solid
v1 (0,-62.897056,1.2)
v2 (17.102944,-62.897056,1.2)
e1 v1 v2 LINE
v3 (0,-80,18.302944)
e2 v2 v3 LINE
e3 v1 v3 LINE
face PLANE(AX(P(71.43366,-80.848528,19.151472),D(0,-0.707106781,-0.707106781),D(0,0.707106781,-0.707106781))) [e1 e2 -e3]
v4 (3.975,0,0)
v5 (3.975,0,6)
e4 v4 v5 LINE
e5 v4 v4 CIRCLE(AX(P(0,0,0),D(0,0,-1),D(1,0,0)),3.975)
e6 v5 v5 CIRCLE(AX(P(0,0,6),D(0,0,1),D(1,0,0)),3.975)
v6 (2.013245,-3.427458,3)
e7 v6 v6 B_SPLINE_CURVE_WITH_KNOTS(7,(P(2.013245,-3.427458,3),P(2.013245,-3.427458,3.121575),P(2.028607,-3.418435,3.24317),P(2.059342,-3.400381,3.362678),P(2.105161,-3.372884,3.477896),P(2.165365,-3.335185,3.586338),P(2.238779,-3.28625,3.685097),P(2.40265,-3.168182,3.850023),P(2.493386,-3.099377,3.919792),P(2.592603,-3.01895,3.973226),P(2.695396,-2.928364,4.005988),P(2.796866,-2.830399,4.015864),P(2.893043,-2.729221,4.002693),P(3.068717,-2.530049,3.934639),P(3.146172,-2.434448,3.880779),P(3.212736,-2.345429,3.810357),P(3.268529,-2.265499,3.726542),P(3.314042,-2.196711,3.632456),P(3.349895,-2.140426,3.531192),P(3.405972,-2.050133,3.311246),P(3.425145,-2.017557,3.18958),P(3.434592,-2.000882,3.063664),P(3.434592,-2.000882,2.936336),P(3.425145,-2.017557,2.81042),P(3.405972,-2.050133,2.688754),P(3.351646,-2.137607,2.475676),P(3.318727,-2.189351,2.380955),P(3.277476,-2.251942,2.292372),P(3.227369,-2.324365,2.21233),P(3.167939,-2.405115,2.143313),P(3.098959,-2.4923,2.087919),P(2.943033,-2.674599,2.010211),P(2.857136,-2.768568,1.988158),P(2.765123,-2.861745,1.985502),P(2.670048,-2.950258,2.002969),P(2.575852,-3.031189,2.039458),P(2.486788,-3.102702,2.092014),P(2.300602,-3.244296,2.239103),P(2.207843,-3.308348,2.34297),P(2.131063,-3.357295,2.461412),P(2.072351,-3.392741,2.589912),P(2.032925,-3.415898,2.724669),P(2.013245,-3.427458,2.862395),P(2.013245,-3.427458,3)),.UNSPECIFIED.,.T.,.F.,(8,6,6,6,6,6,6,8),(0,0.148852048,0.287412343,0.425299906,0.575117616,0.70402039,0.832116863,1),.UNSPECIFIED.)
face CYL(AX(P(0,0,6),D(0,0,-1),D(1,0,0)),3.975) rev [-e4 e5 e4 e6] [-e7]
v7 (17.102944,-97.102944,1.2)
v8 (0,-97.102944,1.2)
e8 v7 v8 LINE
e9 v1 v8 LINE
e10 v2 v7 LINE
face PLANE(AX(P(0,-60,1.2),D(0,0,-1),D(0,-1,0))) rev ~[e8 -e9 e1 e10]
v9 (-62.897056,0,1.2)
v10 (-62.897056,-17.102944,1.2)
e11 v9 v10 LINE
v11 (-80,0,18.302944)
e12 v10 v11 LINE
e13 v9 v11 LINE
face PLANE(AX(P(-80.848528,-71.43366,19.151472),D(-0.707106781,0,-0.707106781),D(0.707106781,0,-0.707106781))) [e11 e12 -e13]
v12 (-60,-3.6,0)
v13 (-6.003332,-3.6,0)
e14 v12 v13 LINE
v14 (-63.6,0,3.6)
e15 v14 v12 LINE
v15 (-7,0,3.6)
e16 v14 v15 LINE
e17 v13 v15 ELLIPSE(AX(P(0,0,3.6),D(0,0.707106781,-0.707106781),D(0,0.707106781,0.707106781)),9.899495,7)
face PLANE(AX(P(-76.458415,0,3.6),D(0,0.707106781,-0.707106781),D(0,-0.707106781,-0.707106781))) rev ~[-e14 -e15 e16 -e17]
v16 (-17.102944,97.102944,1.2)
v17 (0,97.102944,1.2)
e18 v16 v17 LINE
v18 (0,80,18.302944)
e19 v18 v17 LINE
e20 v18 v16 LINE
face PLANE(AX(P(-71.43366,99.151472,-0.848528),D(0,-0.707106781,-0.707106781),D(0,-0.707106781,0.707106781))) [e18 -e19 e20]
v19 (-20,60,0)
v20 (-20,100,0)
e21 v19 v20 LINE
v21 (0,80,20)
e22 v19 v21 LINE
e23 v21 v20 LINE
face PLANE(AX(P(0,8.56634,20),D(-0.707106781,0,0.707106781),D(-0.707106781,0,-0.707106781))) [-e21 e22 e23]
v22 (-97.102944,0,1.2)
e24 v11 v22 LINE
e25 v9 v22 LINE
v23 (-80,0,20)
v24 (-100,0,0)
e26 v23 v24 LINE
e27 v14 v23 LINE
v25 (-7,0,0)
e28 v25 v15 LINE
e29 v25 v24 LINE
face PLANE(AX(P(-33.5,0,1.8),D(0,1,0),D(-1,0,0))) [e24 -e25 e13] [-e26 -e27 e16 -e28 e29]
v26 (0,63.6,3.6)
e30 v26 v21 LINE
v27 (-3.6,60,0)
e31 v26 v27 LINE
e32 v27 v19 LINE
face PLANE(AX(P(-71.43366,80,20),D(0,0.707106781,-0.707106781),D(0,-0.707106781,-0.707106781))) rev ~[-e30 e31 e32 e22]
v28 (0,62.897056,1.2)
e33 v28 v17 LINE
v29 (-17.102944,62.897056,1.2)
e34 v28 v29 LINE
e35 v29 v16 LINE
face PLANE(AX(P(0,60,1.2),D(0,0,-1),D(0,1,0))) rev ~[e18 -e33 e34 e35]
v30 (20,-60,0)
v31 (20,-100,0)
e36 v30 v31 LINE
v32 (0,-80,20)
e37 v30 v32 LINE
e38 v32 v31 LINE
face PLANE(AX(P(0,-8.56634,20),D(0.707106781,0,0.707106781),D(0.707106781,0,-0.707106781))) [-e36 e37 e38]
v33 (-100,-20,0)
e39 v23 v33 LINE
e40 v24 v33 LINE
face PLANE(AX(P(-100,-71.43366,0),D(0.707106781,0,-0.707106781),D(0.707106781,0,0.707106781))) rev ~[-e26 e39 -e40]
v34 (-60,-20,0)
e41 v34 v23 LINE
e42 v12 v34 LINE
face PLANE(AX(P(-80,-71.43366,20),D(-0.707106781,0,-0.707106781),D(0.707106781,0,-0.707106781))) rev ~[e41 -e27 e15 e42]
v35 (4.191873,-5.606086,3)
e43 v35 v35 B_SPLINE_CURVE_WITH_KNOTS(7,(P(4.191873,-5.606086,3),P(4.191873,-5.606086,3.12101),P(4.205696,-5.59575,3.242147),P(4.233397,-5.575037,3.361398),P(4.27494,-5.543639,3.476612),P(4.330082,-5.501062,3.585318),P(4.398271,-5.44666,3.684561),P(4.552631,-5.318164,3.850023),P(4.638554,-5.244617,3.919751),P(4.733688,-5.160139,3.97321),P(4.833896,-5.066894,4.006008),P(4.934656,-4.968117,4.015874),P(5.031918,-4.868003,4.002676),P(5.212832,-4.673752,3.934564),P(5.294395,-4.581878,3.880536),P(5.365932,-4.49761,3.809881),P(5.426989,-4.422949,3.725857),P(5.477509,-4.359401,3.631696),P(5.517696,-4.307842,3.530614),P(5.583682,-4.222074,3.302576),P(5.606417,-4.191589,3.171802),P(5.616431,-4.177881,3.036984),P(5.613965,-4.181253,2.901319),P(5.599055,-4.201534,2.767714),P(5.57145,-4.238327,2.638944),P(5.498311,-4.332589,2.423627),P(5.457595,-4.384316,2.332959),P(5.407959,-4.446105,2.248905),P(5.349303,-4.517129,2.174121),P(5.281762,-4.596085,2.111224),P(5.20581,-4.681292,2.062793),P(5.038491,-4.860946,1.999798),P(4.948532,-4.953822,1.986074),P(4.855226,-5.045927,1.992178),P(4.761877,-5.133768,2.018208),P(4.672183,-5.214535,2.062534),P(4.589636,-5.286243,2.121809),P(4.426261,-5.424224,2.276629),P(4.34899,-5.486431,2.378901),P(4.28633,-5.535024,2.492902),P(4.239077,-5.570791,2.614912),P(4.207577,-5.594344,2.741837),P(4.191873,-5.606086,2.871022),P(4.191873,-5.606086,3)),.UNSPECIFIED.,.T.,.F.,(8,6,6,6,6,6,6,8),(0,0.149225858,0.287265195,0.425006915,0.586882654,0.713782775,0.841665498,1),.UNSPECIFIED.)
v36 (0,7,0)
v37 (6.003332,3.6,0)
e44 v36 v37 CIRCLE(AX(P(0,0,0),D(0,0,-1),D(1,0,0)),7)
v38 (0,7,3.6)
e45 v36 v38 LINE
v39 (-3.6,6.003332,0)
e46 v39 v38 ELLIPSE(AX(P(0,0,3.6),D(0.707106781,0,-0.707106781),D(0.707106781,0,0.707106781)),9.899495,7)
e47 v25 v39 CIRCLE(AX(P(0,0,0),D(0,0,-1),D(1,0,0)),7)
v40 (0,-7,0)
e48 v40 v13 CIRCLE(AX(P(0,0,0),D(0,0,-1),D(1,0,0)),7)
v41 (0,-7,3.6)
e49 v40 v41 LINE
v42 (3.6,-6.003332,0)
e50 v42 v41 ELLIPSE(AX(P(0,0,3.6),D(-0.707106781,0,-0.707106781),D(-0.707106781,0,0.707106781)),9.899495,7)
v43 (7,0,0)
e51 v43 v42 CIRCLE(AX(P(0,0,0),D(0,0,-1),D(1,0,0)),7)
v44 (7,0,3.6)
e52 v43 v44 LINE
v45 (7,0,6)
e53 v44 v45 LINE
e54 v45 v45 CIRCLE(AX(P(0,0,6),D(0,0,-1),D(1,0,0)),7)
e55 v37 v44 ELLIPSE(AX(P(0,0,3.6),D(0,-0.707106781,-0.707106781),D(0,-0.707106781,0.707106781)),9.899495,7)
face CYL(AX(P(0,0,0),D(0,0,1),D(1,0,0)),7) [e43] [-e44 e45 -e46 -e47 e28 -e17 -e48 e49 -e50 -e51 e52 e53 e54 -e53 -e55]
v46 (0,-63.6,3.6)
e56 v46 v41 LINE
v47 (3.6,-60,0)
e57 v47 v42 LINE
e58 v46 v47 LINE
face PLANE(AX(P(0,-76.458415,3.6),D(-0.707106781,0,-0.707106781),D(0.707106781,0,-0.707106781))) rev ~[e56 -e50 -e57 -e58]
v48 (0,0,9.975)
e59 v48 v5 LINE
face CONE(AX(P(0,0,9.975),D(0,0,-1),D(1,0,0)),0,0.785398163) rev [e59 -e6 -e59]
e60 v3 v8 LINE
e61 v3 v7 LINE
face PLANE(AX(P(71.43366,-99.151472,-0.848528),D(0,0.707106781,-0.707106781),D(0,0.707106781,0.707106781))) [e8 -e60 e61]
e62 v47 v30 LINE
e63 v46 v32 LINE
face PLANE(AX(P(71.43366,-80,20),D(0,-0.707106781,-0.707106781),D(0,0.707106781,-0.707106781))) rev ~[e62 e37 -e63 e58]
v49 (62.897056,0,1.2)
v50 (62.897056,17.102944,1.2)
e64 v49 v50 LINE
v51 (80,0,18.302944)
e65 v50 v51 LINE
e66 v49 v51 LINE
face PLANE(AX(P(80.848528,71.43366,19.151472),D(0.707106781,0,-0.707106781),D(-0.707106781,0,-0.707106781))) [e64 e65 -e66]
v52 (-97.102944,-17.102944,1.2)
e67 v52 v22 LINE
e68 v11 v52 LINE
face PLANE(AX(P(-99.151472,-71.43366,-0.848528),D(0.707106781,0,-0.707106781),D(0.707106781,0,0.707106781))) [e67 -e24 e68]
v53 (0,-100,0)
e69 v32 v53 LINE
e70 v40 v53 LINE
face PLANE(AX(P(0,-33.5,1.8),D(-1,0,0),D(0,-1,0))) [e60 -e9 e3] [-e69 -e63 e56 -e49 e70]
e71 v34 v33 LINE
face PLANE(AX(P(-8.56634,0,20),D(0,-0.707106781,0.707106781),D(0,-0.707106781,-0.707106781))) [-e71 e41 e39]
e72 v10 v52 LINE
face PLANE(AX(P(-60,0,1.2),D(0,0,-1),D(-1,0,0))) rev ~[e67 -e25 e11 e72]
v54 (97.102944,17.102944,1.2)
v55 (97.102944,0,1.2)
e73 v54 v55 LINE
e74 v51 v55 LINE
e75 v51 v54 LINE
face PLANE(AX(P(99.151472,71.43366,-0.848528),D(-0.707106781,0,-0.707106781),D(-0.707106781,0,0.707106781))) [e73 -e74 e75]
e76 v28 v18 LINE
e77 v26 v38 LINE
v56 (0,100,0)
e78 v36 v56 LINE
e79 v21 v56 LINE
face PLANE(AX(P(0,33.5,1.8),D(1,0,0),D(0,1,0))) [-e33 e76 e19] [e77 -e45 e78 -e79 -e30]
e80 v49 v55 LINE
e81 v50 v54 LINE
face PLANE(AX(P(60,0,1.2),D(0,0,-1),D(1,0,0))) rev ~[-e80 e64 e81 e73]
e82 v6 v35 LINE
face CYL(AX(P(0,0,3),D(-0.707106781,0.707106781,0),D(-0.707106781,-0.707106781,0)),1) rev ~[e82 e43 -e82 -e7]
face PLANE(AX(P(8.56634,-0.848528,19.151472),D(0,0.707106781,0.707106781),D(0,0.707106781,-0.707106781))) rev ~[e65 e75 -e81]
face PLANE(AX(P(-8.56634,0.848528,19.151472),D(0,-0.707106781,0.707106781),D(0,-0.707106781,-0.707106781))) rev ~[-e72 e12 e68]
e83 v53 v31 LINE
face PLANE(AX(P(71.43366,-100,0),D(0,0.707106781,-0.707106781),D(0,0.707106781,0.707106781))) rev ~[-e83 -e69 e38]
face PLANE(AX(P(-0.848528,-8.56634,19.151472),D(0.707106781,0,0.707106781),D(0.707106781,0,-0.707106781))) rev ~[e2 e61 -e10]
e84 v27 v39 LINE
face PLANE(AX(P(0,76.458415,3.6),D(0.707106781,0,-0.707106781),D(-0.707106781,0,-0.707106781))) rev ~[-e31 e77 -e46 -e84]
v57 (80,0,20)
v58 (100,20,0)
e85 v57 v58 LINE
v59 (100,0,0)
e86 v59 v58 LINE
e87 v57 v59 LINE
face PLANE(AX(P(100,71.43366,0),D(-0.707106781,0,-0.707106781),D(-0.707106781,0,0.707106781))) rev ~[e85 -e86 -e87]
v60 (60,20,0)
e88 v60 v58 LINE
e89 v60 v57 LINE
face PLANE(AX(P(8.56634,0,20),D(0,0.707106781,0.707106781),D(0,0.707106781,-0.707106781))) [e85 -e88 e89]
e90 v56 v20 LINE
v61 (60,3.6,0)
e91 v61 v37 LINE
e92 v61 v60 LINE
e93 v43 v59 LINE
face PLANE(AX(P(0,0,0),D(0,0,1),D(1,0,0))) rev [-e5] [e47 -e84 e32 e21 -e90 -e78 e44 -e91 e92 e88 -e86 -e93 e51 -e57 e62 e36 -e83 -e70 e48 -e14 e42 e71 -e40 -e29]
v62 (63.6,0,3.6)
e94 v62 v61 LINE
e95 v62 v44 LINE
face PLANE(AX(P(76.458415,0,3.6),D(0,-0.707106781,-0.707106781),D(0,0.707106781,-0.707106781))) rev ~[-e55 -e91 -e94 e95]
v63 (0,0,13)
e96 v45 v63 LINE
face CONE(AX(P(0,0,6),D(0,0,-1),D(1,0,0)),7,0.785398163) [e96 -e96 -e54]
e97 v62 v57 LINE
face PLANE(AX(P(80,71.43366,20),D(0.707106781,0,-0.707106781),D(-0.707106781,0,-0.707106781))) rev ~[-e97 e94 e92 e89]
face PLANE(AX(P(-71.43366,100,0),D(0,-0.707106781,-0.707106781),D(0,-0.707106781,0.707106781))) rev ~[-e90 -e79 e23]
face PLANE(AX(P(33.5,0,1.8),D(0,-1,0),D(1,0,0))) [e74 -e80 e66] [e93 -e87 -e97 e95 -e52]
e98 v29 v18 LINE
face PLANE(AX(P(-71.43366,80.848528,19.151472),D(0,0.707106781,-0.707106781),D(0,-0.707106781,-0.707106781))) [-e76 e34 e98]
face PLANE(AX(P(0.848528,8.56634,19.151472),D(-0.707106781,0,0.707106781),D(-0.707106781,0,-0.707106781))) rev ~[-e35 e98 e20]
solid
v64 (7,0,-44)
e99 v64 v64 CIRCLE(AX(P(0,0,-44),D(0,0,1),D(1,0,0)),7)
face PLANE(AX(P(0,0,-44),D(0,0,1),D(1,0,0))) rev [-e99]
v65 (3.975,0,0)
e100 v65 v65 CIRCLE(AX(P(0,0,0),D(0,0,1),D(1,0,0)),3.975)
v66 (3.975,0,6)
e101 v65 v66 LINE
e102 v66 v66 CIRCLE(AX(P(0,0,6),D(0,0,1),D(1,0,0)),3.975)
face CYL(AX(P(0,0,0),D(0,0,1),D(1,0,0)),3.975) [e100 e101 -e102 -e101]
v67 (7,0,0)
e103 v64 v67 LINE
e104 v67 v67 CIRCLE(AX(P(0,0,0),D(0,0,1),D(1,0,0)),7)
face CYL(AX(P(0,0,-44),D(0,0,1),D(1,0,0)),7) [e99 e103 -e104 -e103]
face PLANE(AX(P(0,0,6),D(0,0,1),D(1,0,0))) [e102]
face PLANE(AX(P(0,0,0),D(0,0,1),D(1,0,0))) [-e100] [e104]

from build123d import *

# Parameters (mm, degrees)
F1_DEPTH    = 20
F2_T1_DEPTH = 122.8673195186
F2_T3_DEPTH = 142.8673195186
F3_T        = -1.2
F0_W        = 53
F0_H        = 3.6
F0_W_2      = 3.025
F4_DEPTH    = 5
F0_H_2      = 2.4
F6_T4_DEPTH = 84.4178503941
F6_S5_R     = 7
F6_T6_DEPTH = 44
F7_COUNT    = 4
F9_R        = 1
F10_DEPTH   = 141.4223562373


# Not quite as in the source:
# - a fillet or chamfer that OpenCascade refuses, or shapes differently, is made with other operations: its cross-section is extruded or revolved along the edge and cut away or added


with BuildPart() as f1:
    # F0 (on Front) → F1 (new body)
    with BuildSketch(Plane.XZ):
        Polygon((63.6, 3.6), (60, 0), (100, 0), (100, 20), (60, 20), (60, 3.6), align=None)
        Polygon((60, 3.6), (60, 0), (63.6, 3.6), align=None)
    extrude(amount=-F1_DEPTH)

    # F2: chamfer of 20 on 3 edges, made by hand

    # F2_s2 → F2_t1 (cut)
    with BuildSketch(Plane.XZ.offset(-71.4336597593)):
        Polygon((80, 20), (60, 0), (60, 20), align=None)
        Polygon((100, 0), (80, 20), (100, 20), align=None)
    extrude(amount=F2_T1_DEPTH, mode=Mode.SUBTRACT)

    # F2_s4 → F2_t3 (cut)
    with BuildSketch(Plane.YZ.offset(8.5663402407)):
        Polygon((0, 20), (20, 0), (20, 20), align=None)
    extrude(amount=F2_T3_DEPTH, mode=Mode.SUBTRACT)

    # F3
    f3_openings = [f1.faces().sort_by_distance(p)[0] for p in [
        (80, 0, 6.666667),
    ]]
    offset(amount=F3_T, openings=f3_openings)

    # F0 (on Front) → F4 (join)
    with BuildSketch(Plane.XZ):
        with Locations((33.5, 1.8)):
            Rectangle(F0_W, F0_H)
        Polygon((60, 3.6), (60, 0), (63.6, 3.6), align=None)
        with Locations((5.4875, 1.8)):
            Rectangle(F0_W_2, F0_H)
    extrude(amount=-F4_DEPTH)

    # F0 (on Front) → F5 (revolve)
    with BuildSketch(Plane.XZ):
        with Locations((5.4875, 4.8)):
            Rectangle(F0_W_2, F0_H_2)
        with Locations((5.4875, 1.8)):
            Rectangle(F0_W_2, F0_H)
        Polygon((0, 9.975), (3.975, 6), (7, 6), (0, 13), align=None)
    revolve(axis=Axis((0, 0, 3), (0, 0, 1)))

    # F6: chamfer of 5 on 1 edges, made by hand


with BuildPart() as f6_tool2:
    # F6_s3 → F6_t4 (new body)
    with BuildSketch(Plane.YZ.offset(76.4584149398)):
        Polygon((0, 3.6), (5, -1.4), (5, 3.6), align=None)
    extrude(amount=-F6_T4_DEPTH)

    # F6_s5 → F6_t6 (cut, symmetric)
    with BuildSketch(Plane.XY.offset(1.1)):
        Circle(F6_S5_R)
    extrude(amount=F6_T6_DEPTH, both=True, mode=Mode.SUBTRACT)

    split(bisect_by=Plane(origin=(30, 0, -30), x_dir=(0, 1, 0), z_dir=(-0.7071067812, 0, 0.7071067812)), keep=Keep.TOP)


with BuildPart() as f1_1:
    add(f1.part)

    # F6_t1: cut F6_tool2
    add(f6_tool2.part, mode=Mode.SUBTRACT)

    # F7: F1 ×4 about axis
    f7_axis = Axis((0, 0, 3), (0, 0, 1))


with BuildPart() as f1_2:
    add(f1_1.part)
    for i in range(1, F7_COUNT):
        add(f1_1.part.rotate(f7_axis, i * 360 / F7_COUNT))

    # F9 (on line) → F10 (cut, through all)
    with BuildSketch(Plane(origin=(0, 0, 0), x_dir=(-0.7071067812, -0.7071067812, 0), z_dir=(-0.7071067812, 0.7071067812, 0))):
        with Locations((0, 3)):
            Circle(F9_R)
    extrude(amount=-F10_DEPTH, mode=Mode.SUBTRACT)


with BuildPart() as f12:
    # F11 (on Front) → F12 (revolve)
    with BuildSketch(Plane.XZ):
        Polygon((3.975, 6), (0, 6), (0, -44), (7, -44), (7, 0), (3.975, 0), align=None)
    revolve(axis=Axis((0, 0, -19), (0, 0, 1)))


solid = Compound([f1_2.part, f12.part])
